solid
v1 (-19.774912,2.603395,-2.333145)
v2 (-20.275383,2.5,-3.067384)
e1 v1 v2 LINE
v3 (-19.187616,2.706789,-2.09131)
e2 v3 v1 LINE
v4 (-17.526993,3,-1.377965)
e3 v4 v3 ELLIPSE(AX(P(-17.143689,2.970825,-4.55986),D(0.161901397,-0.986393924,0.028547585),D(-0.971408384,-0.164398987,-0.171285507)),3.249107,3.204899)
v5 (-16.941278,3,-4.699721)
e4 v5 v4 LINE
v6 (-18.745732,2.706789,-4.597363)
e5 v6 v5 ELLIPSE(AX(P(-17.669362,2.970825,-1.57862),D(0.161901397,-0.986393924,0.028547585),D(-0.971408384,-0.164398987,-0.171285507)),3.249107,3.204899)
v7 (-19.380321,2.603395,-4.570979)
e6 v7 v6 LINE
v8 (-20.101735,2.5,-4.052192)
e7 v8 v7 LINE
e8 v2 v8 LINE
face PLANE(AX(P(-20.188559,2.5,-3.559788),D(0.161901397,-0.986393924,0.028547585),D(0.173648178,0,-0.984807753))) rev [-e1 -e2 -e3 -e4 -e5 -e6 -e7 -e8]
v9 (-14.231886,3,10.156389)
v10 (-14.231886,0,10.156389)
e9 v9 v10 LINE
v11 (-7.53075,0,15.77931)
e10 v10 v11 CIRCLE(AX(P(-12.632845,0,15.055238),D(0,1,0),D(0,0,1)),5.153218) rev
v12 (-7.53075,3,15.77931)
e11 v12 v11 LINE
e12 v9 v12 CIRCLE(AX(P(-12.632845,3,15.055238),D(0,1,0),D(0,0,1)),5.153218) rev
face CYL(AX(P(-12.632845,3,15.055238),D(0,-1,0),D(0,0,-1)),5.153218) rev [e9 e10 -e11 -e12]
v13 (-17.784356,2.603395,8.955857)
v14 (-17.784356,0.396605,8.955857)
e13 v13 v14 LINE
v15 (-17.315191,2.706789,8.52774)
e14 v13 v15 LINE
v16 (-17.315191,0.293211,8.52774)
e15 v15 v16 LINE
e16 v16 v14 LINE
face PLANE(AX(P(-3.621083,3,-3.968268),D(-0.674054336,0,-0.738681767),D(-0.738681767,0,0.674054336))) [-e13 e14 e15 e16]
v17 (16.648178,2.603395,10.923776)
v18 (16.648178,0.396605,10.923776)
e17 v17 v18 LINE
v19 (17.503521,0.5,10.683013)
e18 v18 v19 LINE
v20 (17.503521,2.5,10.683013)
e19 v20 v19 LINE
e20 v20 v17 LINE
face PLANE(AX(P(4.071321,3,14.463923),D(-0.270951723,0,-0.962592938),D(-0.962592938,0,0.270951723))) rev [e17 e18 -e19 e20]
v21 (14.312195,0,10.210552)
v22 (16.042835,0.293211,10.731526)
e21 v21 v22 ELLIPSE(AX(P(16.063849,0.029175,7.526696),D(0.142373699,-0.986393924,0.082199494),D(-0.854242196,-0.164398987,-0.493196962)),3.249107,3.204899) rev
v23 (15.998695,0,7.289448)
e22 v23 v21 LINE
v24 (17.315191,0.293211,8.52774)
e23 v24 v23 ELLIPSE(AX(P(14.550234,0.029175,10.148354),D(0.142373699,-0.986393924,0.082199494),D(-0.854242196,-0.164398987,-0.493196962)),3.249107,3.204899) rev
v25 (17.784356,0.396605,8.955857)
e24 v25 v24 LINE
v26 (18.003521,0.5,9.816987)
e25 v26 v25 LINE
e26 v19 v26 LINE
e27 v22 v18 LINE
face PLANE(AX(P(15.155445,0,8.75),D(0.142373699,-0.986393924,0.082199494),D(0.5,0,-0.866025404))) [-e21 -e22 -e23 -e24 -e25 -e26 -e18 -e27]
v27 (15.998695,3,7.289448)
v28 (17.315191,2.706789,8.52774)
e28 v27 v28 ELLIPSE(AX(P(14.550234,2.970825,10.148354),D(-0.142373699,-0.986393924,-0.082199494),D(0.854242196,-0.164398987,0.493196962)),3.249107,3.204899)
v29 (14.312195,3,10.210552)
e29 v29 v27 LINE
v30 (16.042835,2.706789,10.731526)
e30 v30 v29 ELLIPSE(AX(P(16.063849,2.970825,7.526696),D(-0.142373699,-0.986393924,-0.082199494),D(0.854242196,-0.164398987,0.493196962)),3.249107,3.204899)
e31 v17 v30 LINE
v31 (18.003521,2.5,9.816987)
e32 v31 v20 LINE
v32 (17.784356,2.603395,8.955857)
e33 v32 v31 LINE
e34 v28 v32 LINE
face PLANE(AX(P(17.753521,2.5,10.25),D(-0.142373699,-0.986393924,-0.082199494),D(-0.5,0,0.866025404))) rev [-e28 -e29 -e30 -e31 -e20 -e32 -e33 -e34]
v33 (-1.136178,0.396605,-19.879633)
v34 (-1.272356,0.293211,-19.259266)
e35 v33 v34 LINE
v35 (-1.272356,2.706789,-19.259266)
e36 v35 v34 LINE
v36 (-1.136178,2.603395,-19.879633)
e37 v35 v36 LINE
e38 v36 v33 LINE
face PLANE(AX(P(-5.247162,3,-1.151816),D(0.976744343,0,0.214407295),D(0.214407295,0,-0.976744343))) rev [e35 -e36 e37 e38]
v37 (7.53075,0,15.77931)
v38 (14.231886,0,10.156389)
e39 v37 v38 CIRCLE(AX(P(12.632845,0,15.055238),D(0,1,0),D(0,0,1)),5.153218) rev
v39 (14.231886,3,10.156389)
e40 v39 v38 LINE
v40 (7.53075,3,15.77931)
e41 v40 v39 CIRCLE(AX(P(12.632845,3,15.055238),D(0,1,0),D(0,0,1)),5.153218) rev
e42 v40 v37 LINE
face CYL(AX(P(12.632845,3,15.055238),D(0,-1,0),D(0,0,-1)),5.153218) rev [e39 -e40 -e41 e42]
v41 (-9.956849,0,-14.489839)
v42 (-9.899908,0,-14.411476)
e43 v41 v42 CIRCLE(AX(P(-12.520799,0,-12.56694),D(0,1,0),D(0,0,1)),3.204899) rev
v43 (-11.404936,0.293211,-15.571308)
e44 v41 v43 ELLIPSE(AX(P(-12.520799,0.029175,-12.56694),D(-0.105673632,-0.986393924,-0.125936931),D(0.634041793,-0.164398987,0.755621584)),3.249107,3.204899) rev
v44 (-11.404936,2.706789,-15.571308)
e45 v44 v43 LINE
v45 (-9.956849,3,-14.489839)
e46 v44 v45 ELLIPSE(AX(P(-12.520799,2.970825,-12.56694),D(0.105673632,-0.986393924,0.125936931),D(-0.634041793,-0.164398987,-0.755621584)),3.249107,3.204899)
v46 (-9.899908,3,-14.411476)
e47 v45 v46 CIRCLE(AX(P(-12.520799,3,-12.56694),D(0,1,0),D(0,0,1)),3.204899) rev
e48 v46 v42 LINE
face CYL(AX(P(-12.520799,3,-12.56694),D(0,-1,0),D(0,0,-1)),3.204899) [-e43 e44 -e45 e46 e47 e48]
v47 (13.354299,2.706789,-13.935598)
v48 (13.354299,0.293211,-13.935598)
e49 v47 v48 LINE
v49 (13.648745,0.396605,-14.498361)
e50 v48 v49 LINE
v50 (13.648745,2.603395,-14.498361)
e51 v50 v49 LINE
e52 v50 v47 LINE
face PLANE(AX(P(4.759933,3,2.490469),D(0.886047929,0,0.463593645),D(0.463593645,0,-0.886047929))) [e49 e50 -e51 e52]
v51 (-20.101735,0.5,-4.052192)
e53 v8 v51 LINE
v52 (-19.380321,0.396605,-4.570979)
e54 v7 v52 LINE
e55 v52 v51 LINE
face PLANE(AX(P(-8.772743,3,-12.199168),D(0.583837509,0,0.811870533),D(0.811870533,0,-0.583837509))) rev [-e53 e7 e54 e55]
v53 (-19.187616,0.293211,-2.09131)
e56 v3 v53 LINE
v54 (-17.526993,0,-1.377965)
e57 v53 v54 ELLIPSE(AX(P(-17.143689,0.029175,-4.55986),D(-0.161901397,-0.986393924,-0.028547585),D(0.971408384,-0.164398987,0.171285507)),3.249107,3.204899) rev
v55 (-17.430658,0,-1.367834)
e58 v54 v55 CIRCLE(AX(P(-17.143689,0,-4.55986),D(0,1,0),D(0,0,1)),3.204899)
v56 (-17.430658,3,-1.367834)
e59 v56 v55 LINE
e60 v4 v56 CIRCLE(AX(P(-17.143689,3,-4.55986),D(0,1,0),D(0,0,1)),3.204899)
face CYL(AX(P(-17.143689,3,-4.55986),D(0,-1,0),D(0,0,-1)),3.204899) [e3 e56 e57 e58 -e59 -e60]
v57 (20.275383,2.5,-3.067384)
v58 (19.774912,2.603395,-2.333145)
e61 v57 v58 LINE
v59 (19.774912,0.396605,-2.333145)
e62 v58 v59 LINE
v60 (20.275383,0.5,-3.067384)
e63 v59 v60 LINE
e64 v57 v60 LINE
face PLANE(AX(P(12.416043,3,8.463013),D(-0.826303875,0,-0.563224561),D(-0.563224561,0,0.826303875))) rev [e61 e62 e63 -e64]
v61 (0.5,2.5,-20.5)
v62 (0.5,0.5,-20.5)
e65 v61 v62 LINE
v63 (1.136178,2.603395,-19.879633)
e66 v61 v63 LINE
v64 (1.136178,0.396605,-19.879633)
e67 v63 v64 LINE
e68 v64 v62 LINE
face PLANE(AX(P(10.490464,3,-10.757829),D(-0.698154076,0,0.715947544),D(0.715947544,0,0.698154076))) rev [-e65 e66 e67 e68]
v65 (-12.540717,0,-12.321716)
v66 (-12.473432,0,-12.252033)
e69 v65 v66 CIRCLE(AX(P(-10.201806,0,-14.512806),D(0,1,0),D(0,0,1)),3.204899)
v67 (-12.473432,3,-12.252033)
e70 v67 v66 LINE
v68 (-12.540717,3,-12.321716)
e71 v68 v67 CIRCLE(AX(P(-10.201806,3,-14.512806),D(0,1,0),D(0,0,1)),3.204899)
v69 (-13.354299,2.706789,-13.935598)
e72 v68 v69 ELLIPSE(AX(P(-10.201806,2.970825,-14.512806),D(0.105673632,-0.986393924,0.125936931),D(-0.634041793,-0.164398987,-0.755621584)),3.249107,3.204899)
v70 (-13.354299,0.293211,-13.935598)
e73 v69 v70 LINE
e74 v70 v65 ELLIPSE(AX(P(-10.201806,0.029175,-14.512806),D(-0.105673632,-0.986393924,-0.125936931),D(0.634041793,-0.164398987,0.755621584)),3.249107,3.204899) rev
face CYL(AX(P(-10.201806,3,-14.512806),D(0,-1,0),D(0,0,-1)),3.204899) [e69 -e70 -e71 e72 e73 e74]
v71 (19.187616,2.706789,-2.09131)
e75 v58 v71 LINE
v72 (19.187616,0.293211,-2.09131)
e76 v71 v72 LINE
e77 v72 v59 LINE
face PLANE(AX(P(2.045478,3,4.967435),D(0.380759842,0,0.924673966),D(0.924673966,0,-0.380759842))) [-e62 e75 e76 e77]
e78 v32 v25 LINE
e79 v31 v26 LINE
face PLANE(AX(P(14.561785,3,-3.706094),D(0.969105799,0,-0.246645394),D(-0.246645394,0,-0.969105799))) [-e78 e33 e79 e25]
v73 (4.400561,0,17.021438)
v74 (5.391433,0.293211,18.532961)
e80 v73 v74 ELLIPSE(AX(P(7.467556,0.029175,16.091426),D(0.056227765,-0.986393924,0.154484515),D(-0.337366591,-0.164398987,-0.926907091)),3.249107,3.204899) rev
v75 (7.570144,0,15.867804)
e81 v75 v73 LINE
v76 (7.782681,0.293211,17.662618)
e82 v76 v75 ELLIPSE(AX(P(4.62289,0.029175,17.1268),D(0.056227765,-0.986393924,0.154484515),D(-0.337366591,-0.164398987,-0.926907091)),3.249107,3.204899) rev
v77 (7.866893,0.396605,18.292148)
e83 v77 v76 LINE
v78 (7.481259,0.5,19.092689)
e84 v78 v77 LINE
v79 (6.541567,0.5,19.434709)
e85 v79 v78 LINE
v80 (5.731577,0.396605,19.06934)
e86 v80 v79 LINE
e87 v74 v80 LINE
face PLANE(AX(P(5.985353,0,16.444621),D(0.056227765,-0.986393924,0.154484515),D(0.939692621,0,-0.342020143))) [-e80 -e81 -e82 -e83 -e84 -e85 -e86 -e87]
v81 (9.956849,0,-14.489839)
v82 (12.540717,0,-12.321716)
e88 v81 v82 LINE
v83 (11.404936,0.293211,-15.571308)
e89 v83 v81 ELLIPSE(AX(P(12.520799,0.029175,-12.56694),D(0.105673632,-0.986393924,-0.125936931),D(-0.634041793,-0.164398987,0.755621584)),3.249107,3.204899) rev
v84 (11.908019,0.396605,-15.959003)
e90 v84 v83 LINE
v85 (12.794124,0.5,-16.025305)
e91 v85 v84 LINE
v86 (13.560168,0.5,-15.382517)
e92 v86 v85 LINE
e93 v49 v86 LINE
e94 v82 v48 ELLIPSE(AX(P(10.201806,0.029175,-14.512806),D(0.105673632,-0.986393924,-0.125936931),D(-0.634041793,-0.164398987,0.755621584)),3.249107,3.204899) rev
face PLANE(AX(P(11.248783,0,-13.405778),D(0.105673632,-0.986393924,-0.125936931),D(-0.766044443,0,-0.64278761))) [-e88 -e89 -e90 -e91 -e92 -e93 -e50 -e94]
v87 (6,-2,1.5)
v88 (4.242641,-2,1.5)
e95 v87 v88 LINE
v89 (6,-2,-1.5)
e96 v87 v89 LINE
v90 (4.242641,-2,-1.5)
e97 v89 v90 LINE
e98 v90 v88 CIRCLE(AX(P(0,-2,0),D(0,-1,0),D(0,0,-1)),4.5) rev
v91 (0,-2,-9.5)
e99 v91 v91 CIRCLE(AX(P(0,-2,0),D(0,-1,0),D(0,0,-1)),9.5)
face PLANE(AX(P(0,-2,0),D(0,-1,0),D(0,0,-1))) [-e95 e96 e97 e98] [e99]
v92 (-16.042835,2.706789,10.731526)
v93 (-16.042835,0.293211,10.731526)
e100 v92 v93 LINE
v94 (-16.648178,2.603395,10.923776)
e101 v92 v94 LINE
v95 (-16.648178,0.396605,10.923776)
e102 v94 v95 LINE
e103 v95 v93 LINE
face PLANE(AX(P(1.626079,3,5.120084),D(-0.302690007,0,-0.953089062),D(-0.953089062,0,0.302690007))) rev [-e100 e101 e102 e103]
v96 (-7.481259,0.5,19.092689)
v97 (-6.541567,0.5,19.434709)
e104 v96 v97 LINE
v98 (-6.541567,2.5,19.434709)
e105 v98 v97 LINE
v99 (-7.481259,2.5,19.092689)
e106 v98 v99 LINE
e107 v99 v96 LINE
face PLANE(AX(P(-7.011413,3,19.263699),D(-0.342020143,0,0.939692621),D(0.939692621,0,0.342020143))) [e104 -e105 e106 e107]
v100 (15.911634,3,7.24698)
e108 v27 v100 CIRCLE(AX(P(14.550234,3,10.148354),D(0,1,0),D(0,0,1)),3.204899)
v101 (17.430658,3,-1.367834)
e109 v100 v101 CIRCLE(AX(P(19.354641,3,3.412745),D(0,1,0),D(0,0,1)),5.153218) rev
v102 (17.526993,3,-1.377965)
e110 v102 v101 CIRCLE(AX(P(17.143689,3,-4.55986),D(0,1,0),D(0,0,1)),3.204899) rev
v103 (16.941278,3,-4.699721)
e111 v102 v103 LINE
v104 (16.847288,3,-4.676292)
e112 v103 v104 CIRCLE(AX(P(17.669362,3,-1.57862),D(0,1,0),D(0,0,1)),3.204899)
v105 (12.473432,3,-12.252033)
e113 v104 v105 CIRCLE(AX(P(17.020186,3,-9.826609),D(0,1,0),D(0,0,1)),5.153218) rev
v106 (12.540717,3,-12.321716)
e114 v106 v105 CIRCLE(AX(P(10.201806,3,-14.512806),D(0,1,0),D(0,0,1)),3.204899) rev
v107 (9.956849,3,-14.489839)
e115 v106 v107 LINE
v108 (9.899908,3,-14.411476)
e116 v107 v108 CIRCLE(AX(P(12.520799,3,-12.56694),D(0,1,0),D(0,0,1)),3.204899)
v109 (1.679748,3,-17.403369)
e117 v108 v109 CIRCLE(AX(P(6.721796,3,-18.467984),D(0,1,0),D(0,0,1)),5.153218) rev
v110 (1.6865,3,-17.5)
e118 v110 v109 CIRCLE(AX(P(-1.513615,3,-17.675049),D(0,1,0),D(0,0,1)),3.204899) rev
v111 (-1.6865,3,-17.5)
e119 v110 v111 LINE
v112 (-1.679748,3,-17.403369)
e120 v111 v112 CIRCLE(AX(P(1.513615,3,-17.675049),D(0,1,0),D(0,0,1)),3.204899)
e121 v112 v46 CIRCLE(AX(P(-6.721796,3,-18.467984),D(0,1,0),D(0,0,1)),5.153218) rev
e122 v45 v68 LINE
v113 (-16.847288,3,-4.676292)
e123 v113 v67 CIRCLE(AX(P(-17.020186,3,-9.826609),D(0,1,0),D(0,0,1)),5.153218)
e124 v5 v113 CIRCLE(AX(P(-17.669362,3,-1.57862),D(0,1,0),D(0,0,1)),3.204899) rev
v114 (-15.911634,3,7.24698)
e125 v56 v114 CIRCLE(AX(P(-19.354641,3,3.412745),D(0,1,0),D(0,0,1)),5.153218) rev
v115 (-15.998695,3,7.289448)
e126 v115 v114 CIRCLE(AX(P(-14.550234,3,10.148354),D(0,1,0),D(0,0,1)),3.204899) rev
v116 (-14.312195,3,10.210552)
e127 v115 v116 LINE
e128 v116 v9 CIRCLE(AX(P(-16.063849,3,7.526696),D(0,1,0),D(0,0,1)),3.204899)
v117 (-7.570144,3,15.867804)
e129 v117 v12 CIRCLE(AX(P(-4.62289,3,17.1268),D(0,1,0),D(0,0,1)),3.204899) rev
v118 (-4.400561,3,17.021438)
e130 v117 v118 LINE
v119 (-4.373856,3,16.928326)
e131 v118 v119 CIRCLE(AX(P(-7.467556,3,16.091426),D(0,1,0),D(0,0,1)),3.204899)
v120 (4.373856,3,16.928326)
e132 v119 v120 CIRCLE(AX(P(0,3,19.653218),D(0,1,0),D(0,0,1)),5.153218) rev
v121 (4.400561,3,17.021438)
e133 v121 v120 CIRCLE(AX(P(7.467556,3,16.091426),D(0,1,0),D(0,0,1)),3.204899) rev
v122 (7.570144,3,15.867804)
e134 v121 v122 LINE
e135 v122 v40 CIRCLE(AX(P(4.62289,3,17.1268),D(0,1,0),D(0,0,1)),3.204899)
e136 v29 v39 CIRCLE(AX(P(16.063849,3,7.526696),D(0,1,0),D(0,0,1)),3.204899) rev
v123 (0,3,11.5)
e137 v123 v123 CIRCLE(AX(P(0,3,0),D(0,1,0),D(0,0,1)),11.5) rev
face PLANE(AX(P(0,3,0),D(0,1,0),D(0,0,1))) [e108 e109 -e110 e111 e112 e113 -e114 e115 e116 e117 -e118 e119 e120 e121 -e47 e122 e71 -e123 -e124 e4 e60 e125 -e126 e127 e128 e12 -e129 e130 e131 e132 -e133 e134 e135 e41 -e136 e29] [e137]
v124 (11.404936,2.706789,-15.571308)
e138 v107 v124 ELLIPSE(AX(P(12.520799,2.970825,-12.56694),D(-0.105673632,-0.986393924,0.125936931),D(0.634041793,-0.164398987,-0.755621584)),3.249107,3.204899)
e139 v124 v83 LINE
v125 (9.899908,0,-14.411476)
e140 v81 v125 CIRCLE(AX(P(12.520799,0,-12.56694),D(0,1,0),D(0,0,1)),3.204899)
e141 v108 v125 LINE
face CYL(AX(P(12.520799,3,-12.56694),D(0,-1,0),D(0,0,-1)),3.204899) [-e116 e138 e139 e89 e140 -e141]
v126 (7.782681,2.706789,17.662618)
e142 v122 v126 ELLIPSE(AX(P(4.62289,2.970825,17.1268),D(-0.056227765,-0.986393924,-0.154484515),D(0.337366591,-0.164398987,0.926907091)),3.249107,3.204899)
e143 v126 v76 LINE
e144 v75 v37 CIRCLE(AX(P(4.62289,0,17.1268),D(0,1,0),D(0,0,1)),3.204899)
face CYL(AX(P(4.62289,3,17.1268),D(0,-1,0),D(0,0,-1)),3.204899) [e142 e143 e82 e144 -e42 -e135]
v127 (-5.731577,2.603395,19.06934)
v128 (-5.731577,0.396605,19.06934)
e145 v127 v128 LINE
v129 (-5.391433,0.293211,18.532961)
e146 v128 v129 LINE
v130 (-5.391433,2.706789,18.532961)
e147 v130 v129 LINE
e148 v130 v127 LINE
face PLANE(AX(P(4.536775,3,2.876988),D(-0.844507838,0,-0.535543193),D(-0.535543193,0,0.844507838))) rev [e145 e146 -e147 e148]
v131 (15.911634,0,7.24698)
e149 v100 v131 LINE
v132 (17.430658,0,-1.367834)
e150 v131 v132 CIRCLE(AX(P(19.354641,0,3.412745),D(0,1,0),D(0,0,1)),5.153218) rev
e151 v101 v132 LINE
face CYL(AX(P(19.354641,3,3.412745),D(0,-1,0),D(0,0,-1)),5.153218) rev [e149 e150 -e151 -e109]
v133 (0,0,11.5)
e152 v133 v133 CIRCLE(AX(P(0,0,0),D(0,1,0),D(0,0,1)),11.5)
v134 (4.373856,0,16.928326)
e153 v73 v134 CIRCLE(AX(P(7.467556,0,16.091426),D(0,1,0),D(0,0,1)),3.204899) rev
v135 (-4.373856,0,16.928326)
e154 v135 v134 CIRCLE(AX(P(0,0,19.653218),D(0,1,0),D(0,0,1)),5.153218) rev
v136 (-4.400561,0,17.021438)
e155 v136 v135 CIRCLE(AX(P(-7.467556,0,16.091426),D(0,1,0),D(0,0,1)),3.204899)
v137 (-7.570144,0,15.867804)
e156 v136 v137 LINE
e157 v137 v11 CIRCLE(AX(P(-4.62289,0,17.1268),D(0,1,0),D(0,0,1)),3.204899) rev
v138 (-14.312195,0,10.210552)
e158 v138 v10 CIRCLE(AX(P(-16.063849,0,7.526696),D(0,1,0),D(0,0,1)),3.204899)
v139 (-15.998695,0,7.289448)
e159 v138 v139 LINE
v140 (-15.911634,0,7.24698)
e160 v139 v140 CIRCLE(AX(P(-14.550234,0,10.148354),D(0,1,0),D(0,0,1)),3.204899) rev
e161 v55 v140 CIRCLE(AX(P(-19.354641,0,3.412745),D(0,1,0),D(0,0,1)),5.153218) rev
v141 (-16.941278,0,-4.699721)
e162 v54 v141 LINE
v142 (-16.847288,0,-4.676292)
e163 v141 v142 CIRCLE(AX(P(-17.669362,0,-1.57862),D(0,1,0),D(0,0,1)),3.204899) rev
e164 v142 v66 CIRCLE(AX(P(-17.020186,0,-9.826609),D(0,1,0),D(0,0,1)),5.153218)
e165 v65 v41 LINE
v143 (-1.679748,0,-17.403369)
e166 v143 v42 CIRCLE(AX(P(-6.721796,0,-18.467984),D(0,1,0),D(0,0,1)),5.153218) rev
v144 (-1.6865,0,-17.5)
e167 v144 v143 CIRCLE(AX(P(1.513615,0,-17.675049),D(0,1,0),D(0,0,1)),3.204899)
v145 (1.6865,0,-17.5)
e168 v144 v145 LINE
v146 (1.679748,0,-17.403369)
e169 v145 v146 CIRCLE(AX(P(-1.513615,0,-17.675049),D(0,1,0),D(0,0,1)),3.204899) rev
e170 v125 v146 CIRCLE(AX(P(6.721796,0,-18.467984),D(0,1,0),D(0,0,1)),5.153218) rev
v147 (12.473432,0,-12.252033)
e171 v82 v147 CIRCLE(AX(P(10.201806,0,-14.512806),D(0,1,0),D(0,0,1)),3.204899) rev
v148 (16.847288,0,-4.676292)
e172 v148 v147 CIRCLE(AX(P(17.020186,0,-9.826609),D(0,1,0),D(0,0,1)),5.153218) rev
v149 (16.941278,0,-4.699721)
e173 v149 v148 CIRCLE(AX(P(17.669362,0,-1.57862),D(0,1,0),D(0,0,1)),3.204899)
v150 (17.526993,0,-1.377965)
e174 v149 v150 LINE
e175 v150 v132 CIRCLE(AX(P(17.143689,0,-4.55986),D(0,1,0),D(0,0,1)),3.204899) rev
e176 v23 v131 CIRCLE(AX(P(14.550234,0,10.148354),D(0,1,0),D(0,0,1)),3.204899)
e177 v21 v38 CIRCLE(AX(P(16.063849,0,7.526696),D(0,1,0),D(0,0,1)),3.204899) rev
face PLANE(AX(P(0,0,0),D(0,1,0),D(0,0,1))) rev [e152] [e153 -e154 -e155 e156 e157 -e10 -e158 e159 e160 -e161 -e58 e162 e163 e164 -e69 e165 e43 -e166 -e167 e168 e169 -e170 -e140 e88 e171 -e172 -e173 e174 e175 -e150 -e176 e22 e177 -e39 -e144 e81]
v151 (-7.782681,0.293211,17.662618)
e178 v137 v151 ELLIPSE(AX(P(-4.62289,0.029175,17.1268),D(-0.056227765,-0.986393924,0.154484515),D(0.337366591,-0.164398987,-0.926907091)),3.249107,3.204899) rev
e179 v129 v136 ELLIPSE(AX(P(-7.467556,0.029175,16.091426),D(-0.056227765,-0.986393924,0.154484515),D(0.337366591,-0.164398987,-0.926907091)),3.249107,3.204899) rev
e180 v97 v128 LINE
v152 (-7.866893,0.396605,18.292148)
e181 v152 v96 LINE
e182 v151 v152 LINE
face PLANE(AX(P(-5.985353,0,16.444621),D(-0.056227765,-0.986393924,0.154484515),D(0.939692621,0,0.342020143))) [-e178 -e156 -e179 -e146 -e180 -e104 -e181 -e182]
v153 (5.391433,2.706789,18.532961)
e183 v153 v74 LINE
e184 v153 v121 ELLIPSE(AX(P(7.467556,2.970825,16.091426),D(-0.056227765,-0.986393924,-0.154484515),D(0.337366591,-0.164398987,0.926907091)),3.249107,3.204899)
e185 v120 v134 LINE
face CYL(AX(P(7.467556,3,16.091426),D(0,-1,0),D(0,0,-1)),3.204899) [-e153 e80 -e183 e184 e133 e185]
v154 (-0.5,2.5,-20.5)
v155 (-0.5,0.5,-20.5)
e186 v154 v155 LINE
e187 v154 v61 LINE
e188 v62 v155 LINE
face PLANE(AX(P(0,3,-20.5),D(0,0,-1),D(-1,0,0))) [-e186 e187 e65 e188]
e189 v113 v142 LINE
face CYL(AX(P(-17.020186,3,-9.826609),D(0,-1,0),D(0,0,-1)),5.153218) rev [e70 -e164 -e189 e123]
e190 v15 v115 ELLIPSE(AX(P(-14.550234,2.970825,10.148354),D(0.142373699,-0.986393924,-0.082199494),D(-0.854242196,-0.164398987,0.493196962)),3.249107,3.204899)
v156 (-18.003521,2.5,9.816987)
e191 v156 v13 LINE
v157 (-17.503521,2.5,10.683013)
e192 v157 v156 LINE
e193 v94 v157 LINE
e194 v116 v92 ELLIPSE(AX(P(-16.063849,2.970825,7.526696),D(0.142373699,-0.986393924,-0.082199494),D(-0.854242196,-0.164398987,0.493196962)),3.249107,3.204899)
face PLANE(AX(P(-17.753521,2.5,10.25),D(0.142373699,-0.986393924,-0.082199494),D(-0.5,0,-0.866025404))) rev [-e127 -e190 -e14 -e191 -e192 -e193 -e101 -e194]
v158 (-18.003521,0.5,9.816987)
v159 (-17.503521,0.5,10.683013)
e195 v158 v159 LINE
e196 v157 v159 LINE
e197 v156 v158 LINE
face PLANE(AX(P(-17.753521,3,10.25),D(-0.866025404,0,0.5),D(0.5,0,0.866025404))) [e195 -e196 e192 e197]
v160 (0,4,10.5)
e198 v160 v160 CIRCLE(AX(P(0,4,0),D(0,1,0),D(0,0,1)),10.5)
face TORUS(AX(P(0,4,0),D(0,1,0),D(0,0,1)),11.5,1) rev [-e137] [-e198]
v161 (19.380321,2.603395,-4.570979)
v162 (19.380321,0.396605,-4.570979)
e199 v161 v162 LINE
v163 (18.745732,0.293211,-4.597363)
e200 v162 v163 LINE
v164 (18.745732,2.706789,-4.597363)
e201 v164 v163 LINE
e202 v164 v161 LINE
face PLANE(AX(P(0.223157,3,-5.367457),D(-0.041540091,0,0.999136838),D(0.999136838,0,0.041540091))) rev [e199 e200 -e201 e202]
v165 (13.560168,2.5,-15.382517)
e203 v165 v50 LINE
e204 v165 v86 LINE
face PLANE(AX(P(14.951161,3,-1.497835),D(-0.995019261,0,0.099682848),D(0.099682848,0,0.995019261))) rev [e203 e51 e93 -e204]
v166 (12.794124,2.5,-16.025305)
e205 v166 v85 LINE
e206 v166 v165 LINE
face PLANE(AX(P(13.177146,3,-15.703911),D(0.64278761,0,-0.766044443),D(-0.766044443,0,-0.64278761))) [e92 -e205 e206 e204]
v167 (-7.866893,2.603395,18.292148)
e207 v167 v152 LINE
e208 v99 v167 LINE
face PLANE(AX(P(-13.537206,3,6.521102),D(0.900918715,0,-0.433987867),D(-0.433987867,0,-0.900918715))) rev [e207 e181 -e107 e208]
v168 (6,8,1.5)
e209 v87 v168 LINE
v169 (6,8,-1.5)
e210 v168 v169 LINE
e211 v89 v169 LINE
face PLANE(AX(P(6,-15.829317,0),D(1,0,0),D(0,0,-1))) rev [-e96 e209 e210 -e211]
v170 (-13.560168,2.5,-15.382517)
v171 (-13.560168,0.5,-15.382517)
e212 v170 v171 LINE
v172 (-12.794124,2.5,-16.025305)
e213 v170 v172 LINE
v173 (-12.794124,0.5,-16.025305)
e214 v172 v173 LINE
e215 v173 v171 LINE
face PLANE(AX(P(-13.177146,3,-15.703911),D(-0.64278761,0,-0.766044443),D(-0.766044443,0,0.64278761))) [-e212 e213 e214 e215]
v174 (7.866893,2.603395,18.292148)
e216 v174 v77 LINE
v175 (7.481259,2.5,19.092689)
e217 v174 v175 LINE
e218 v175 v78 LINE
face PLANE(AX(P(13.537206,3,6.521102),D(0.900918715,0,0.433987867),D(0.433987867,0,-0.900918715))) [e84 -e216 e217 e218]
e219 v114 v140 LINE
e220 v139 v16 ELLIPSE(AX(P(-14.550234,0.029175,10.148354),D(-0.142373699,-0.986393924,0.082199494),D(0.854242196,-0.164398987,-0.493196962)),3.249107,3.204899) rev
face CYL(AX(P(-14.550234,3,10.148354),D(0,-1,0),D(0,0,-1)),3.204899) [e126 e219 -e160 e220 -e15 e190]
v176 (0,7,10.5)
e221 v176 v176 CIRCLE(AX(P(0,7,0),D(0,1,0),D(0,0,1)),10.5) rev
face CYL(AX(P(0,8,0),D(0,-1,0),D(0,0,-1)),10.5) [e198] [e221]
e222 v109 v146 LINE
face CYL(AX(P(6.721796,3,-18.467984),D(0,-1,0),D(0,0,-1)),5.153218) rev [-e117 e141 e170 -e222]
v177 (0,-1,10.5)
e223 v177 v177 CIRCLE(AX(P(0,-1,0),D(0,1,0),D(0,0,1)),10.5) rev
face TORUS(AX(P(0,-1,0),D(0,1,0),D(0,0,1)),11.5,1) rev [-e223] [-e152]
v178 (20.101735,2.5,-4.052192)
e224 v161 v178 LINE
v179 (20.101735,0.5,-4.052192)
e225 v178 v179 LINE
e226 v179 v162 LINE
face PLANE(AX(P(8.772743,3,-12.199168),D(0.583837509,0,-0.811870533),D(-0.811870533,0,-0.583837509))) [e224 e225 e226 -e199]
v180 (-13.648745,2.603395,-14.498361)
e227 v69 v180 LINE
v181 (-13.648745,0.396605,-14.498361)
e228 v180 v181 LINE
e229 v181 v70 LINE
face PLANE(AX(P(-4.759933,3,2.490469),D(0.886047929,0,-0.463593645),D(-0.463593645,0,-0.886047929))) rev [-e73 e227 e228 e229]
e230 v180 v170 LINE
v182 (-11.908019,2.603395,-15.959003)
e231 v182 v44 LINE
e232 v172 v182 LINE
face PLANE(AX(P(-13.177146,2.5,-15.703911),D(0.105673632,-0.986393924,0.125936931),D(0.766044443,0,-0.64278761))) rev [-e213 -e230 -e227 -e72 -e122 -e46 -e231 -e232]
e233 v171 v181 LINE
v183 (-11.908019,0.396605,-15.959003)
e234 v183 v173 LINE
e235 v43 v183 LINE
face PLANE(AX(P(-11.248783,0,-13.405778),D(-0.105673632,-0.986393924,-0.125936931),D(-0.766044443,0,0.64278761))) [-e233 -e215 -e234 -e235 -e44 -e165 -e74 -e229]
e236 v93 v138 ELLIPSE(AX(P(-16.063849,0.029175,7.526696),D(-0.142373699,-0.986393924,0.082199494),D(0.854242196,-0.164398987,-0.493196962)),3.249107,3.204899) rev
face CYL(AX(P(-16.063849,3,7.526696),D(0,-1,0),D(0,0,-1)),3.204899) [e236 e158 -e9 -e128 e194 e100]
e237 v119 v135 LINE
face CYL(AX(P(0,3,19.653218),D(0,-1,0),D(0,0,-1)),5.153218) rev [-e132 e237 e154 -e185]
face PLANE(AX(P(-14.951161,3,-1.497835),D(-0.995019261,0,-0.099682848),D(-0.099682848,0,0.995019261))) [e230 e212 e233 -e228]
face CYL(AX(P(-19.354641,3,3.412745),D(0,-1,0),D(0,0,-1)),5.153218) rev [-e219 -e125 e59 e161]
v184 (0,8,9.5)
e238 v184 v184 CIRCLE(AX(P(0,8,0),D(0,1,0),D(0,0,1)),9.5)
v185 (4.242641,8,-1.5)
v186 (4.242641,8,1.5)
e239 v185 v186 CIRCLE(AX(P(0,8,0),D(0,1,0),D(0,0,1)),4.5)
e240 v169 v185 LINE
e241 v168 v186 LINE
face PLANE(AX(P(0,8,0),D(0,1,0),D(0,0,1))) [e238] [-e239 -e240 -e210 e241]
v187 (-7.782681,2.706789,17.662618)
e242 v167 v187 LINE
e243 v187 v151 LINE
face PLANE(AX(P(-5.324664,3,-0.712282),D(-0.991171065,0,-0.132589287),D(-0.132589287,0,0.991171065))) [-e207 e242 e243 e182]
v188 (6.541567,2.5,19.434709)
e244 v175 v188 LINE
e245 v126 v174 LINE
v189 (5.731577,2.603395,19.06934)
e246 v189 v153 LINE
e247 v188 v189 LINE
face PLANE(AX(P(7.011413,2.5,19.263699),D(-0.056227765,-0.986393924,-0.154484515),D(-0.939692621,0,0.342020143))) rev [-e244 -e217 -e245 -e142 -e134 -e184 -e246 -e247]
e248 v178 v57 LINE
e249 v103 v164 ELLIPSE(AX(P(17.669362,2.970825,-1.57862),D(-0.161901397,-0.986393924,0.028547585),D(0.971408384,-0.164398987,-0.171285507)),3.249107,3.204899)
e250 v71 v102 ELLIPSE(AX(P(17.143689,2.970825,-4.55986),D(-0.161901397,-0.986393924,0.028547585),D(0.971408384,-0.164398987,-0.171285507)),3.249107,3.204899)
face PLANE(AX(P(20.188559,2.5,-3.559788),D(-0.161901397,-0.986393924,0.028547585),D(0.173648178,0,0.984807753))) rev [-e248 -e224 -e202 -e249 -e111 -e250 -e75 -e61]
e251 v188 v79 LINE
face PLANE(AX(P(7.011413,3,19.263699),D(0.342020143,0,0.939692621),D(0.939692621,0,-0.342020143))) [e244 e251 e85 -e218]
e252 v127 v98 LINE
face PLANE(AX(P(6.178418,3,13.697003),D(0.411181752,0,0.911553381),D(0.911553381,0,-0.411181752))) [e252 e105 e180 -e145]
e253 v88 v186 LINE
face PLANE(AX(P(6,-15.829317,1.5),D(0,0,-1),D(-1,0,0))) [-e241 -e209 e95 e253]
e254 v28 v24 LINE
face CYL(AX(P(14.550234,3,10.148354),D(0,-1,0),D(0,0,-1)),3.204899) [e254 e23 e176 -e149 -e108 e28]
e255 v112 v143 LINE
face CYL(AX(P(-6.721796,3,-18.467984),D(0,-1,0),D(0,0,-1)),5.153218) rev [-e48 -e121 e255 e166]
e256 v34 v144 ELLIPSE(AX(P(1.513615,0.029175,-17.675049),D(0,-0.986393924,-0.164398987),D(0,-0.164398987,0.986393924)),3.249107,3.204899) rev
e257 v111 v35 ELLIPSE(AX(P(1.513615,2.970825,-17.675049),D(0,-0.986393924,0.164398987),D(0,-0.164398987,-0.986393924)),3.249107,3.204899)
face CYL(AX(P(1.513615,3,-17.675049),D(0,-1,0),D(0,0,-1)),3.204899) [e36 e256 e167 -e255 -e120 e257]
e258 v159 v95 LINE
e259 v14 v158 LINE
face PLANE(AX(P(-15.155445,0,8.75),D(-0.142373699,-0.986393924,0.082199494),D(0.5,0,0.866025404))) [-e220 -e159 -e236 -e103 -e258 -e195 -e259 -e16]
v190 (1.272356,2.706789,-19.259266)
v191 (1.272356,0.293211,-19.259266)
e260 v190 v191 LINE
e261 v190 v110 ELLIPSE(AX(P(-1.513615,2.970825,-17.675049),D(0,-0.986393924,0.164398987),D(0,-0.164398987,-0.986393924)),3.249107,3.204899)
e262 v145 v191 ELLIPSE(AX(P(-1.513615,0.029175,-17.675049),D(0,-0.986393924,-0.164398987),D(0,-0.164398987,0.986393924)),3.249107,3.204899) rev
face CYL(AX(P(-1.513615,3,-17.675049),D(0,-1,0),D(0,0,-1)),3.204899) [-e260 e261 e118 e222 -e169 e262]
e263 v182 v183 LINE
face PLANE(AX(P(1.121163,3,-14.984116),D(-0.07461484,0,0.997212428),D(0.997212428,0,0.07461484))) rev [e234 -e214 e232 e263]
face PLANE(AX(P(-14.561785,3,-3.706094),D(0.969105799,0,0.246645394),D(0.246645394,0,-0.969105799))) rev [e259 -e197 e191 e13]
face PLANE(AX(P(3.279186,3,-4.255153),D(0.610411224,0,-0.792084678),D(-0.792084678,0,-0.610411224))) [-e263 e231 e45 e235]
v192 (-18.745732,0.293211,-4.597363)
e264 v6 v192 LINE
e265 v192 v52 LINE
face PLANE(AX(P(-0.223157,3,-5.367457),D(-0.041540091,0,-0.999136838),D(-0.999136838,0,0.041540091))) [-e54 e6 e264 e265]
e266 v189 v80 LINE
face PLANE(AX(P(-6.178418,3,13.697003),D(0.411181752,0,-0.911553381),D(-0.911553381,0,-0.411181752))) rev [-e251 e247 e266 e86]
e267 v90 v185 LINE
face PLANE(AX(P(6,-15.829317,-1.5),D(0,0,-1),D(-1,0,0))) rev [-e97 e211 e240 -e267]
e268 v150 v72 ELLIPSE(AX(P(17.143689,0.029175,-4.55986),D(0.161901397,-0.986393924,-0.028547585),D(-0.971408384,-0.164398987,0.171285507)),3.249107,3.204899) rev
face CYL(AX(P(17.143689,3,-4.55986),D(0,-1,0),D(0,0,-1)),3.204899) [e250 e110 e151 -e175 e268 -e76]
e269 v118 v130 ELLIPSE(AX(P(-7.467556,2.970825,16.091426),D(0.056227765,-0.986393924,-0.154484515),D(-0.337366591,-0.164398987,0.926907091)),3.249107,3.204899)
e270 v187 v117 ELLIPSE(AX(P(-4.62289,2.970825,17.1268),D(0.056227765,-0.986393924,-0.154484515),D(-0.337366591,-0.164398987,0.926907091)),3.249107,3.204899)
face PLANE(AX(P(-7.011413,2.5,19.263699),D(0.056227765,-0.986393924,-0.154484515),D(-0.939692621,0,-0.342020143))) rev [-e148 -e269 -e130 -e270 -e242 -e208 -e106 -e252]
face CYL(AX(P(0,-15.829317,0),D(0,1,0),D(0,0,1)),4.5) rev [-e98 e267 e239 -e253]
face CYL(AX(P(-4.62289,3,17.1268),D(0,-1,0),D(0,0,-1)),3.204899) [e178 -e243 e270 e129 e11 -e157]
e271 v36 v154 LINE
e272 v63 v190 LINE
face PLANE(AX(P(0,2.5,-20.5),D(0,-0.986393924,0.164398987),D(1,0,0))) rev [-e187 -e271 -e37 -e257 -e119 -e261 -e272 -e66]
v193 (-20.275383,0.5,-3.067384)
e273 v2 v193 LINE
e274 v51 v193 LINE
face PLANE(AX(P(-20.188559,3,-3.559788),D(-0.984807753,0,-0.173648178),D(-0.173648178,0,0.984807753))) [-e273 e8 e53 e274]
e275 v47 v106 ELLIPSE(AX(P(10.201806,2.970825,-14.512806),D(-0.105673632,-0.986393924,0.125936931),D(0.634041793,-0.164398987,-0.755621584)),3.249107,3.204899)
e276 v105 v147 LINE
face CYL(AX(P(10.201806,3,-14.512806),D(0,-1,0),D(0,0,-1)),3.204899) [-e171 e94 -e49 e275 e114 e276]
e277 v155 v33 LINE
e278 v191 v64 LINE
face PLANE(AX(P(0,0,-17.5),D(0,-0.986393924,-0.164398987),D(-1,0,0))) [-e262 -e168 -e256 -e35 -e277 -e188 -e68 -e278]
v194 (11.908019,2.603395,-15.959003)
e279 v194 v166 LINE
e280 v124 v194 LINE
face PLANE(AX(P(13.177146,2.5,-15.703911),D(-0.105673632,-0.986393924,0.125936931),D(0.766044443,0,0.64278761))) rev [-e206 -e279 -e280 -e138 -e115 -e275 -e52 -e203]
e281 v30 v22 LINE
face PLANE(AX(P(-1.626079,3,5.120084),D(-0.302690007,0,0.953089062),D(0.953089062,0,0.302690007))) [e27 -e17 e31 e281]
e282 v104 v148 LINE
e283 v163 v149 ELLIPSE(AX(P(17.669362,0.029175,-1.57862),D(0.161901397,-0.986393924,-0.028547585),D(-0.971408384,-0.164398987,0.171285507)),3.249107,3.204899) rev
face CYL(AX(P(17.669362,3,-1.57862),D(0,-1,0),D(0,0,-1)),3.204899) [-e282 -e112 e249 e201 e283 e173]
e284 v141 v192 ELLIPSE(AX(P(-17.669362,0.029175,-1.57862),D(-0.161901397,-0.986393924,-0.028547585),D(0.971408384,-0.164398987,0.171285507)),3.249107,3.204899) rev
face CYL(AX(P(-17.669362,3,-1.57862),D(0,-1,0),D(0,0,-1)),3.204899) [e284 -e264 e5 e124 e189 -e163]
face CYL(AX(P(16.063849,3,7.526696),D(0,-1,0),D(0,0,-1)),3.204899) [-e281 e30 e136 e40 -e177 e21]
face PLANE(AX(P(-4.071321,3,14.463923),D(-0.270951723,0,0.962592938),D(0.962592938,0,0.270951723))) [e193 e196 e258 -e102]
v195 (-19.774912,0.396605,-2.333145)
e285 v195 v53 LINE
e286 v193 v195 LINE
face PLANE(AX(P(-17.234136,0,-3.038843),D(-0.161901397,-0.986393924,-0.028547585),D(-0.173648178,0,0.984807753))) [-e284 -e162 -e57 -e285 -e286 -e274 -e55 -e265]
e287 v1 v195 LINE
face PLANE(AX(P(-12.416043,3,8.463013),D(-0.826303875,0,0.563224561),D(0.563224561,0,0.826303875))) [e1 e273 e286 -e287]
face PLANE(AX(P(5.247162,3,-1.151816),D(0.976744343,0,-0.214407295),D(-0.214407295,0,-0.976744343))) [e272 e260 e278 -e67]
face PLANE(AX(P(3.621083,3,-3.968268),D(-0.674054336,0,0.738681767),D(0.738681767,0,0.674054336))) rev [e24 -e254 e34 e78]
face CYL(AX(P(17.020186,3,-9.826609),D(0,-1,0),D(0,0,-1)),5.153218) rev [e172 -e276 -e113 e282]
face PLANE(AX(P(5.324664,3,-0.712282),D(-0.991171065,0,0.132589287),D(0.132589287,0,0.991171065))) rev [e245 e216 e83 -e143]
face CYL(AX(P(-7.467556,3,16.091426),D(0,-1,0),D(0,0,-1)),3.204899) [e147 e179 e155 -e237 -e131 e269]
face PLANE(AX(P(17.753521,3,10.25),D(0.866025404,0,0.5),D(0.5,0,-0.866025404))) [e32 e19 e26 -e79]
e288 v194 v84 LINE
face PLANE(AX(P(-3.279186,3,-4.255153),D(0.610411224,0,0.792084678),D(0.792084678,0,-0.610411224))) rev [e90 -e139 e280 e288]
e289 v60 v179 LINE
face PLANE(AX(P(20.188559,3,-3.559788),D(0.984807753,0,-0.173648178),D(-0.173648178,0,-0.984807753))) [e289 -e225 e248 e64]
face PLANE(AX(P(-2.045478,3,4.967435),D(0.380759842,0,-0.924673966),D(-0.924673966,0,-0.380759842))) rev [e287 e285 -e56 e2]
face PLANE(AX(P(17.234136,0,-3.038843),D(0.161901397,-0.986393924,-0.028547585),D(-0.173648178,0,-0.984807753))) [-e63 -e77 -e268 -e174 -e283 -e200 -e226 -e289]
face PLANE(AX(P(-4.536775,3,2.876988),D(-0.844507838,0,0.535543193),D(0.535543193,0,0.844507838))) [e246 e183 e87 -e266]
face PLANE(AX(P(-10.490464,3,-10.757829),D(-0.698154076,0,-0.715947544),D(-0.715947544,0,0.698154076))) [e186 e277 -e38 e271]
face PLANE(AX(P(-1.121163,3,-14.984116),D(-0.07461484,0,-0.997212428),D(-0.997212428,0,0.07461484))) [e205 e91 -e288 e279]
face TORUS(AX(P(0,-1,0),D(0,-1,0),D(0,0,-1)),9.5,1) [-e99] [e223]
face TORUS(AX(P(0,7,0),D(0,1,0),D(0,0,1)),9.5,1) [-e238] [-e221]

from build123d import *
from OCP.BRepFilletAPI import BRepFilletAPI_MakeChamfer

# Parameters (mm, degrees)
BOSS_EXTRUDE1_DEPTH = 3
SKETCH2_R           = 10.500000000000002
BOSS_EXTRUDE2_DEPTH = 5
FILLET1_R           = 1
FILLET2_R           = 1
BOSS_EXTRUDE3_START = 2
SKETCH4_R           = 10.5
BOSS_EXTRUDE3_DEPTH = 2
FILLET3_R           = 1
FILLET4_R           = 1
CUT_EXTRUDE1_DEPTH  = 10
CHAMFER1_SIZE       = 3
CHAMFER1_SIZE2      = 0.5
CHAMFER2_SIZE       = 0.5
CHAMFER2_SIZE2      = 3


with BuildPart() as part:
    # Sketch1 → Boss-Extrude1 (new body)
    with BuildSketch(Plane(origin=(0, 0, 0), x_dir=(1, 0, 0), z_dir=(0, 1, 0))):
        with BuildLine():
            Line((-1.1361781683937604, 19.87963278842776), (-1.2723563367881987, 19.259265576854713))
            ThreePointArc((-1.2723563367881987, 19.259265576854713), (-1.61675206137744, 18.362202828380155), (-1.679748173200239, 17.40336943319931))
            ThreePointArc((-1.679748173200239, 17.40336943319931), (-4.959292078222066, 13.625543001395792), (-9.899908484538452, 14.411475758975762))
            ThreePointArc((-9.899908484538452, 14.411475758975762), (-10.56449253211368, 15.105491633091315), (-11.404935782999473, 15.571308262094906))
            Line((-11.404935782999473, 15.571308262094906), (-11.908018669226982, 15.9590034778603))
            Line((-11.908018669226982, 15.9590034778603), (-12.794123777014558, 16.025304888782568))
            Line((-12.794123777014558, 16.025304888782568), (-13.177145998574076, 15.703911083939328))
            Line((-13.177145998574076, 15.703911083939328), (-13.560168220133505, 15.382517279095985))
            Line((-13.560168220133505, 15.382517279095985), (-13.64874461381075, 14.498360979781168))
            Line((-13.64874461381075, 14.498360979781168), (-13.354298785928489, 13.935598485308667))
            ThreePointArc((-13.354298785928489, 13.935598485308667), (-13.041500397153213, 13.027035247115714), (-12.47343199237884, 12.252033132723007))
            ThreePointArc((-12.47343199237884, 12.252033132723007), (-12.557368354878863, 7.250000000000451), (-16.847287937141115, 4.676292411418168))
            ThreePointArc((-16.847287937141115, 4.676292411418168), (-17.802493658572583, 4.780753023841534), (-18.74573169818019, 4.597362755687927))
            Line((-18.74573169818019, 4.597362755687927), (-19.380321228631775, 4.570979075436471))
            Line((-19.380321228631775, 4.570979075436471), (-20.101734847916855, 4.0521915186783986))
            Line((-20.101734847916855, 4.0521915186783986), (-20.18855893675035, 3.559787642172294))
            Line((-20.18855893675035, 3.559787642172294), (-20.275383025583707, 3.0673837656661704))
            Line((-20.275383025583707, 3.0673837656661704), (-19.77491176552594, 2.333144937361034))
            Line((-19.77491176552594, 2.333144937361034), (-19.18761641663395, 2.0913099855612147))
            ThreePointArc((-19.18761641663395, 2.0913099855612147), (-18.363985756968965, 1.5963730943559744), (-17.430658355565846, 1.3678343632640542))
            ThreePointArc((-17.430658355565846, 1.3678343632640542), (-14.27971241867698, -2.5178985761701718), (-15.911634127196386, -7.246980126647359))
            ThreePointArc((-15.911634127196386, -7.246980126647359), (-16.710510149506995, -7.78095305741542), (-17.315191416180426, -8.527739878101265))
            Line((-17.315191416180426, -8.527739878101265), (-17.784356096880753, -8.955857237158021))
            Line((-17.784356096880753, -8.955857237158021), (-18.003520777580764, -9.816987298107405))
            Line((-18.003520777580764, -9.816987298107405), (-17.753520777580768, -10.249999999999627))
            Line((-17.753520777580768, -10.249999999999627), (-17.503520777580654, -10.683012701891785))
            Line((-17.503520777580654, -10.683012701891785), (-16.64817792848777, -10.92377555126792))
            Line((-16.64817792848777, -10.92377555126792), (-16.042835079393377, -10.731525698751813))
            ThreePointArc((-16.042835079393377, -10.731525698751813), (-15.093758088131102, -10.581249770963566), (-14.2318859539962, -10.156389306551269))
            ThreePointArc((-14.2318859539962, -10.156389306551269), (-9.320420340454985, -11.107644425224919), (-7.530749871027556, -15.77931012223921))
            ThreePointArc((-7.530749871027556, -15.77931012223921), (-7.799493224853872, -16.701864727446964), (-7.7826806336331344, -17.66261824765509))
            Line((-7.7826806336331344, -17.66261824765509), (-7.866893096297905, -18.29214841522))
            Line((-7.866893096297905, -18.29214841522), (-7.4812592485692155, -19.09268865444786))
            Line((-7.4812592485692155, -19.09268865444786), (-7.011412938176259, -19.2636987261107))
            Line((-7.011412938176259, -19.2636987261107), (-6.541566627783259, -19.434708797773407))
            Line((-6.541566627783259, -19.434708797773407), (-5.731576614822292, -19.06934005521649))
            Line((-5.731576614822292, -19.06934005521649), (-5.391432912253138, -18.532961240995856))
            ThreePointArc((-5.391432912253138, -18.532961240995856), (-4.760993261421028, -17.80778827095715), (-4.373855944757768, -16.92832554413727))
            ThreePointArc((-4.373855944757768, -16.92832554413727), (-2.5873e-13, -14.499999999999906), (4.3738559447571745, -16.928325544137405))
            ThreePointArc((4.3738559447571745, -16.928325544137405), (4.760993261420172, -17.807788270955786), (5.391432912251758, -18.532961240994798))
            Line((5.391432912251758, -18.532961240994798), (5.731576614820664, -19.06934005521577))
            Line((5.731576614820664, -19.06934005521577), (6.541566627782982, -19.434708797773652))
            Line((6.541566627782982, -19.434708797773652), (7.0114129381759405, -19.26369872611082))
            Line((7.0114129381759405, -19.26369872611082), (7.4812592485688505, -19.092688654447862))
            Line((7.4812592485688505, -19.092688654447862), (7.866893096297095, -18.292148415221522))
            Line((7.866893096297095, -18.292148415221522), (7.782680633632731, -17.66261824765671))
            ThreePointArc((7.782680633632731, -17.66261824765671), (7.7994932248540705, -16.701864727448484), (7.530749871027006, -15.779310122239508))
            ThreePointArc((7.530749871027006, -15.779310122239508), (9.320420340454572, -11.107644425225274), (14.23188595399582, -10.156389306551766))
            ThreePointArc((14.23188595399582, -10.156389306551766), (15.093758088129494, -10.581249770962984), (16.04283507939157, -10.731525698751803))
            Line((16.04283507939157, -10.731525698751803), (16.64817792848599, -10.923775551268324))
            Line((16.64817792848599, -10.923775551268324), (17.5035207775806, -10.683012701892142))
            Line((17.5035207775806, -10.683012701892142), (17.753520777580604, -10.249999999999922))
            Line((17.753520777580604, -10.249999999999922), (18.00352077758049, -9.816987298107634))
            Line((18.00352077758049, -9.816987298107634), (17.784356096881123, -8.955857237159611))
            Line((17.784356096881123, -8.955857237159611), (17.315191416181165, -8.52773987810267))
            ThreePointArc((17.315191416181165, -8.52773987810267), (16.71051014950813, -7.780953057416363), (15.911634127196157, -7.246980126647927))
            ThreePointArc((15.911634127196157, -7.246980126647927), (14.279712418676887, -2.5178985761706927), (17.43065835556587, 1.3678343632634447))
            ThreePointArc((17.43065835556587, 1.3678343632634447), (18.363985756967264, 1.5963730943555055), (19.187616416632455, 2.091309985560174))
            Line((19.187616416632455, 2.091309985560174), (19.774911765524735, 2.3331449373596937))
            Line((19.774911765524735, 2.3331449373596937), (20.275383025583377, 3.0673837656658103))
            Line((20.275383025583377, 3.0673837656658103), (20.188558936749914, 3.559787642171918))
            Line((20.188558936749914, 3.559787642171918), (20.101734847916315, 4.052191518678001))
            Line((20.101734847916315, 4.052191518678001), (19.380321228632635, 4.570979075435552))
            Line((19.380321228632635, 4.570979075435552), (18.74573169818122, 4.597362755687423))
            ThreePointArc((18.74573169818122, 4.597362755687423), (17.802493658573834, 4.78075302384167), (16.847287937134777, 4.676292411414891))
            ThreePointArc((16.847287937134777, 4.676292411414891), (12.557368354874384, 7.249999999999774), (12.473431992377382, 12.252033132722048))
            ThreePointArc((12.473431992377382, 12.252033132722048), (13.041500397151985, 13.027035247114444), (13.354298785927934, 13.935598485306992))
            Line((13.354298785927934, 13.935598485306992), (13.648744613810612, 14.498360979779449))
            Line((13.648744613810612, 14.498360979779449), (13.560168220133354, 15.382517279095445))
            Line((13.560168220133354, 15.382517279095445), (13.177145998573863, 15.703911083938719))
            Line((13.177145998573863, 15.703911083938719), (12.794123777014287, 16.025304888781886))
            Line((12.794123777014287, 16.025304888781886), (11.908018669228412, 15.959003477860701))
            Line((11.908018669228412, 15.959003477860701), (11.404935783000788, 15.571308262095705))
            ThreePointArc((11.404935783000788, 15.571308262095705), (10.564492532114471, 15.105491633092715), (9.899908484538779, 14.411475758975572))
            ThreePointArc((9.899908484538779, 14.411475758975572), (4.959292078222331, 13.625543001395524), (1.6797481732004549, 17.403369433199202))
            ThreePointArc((1.6797481732004549, 17.403369433199202), (1.6167520613771744, 18.362202828378468), (1.272356336788733, 19.259265576853146))
            Line((1.272356336788733, 19.259265576853146), (1.1361781683946401, 19.879632788426427))
            Line((1.1361781683946401, 19.879632788426427), (0.5000000000000316, 20.499999999999623))
            Line((0.5000000000000316, 20.499999999999623), (-1.246e-14, 20.50000000000019))
            Line((-1.246e-14, 20.50000000000019), (-0.500000000000012, 20.500000000000096))
            Line((-0.500000000000012, 20.500000000000096), (-1.1361781683937604, 19.87963278842776))
        make_face()
    extrude(amount=BOSS_EXTRUDE1_DEPTH)

    # Sketch2 → Boss-Extrude2 (add)
    with BuildSketch(Plane(origin=(0, 3, 0), x_dir=(1, 0, 0), z_dir=(0, 1, 0))):
        with Locations(Location((0, 0, 0), (0, 0, 270))):
            Circle(SKETCH2_R)
    extrude(amount=BOSS_EXTRUDE2_DEPTH)

    # Fillet1
    fillet1_edges = [part.edges().sort_by_distance(p)[0] for p in [
        (-1.45e-15, 3, -10.500000000000002),
    ]]
    fillet(fillet1_edges, radius=FILLET1_R)

    # Fillet2
    fillet2_edges = [part.edges().sort_by_distance(p)[0] for p in [
        (-1.45e-15, 8, -10.500000000000002),
    ]]
    fillet(fillet2_edges, radius=FILLET2_R)

    # Sketch4 → Boss-Extrude3 (add)
    with BuildSketch(Plane.XZ.offset(BOSS_EXTRUDE3_START)):
        with Locations(Location((0, 0, 0), (0, 0, 90))):
            Circle(SKETCH4_R)
    extrude(amount=-BOSS_EXTRUDE3_DEPTH)

    # Fillet3
    fillet3_edges = [part.edges().sort_by_distance(p)[0] for p in [
        (-1.93e-15, 0, -10.5),
    ]]
    fillet(fillet3_edges, radius=FILLET3_R)

    # Fillet4
    fillet4_edges = [part.edges().sort_by_distance(p)[0] for p in [
        (-1.93e-15, -2, -10.5),
    ]]
    fillet(fillet4_edges, radius=FILLET4_R - 0.0001)  # a hair under: the kernel refuses the full size

    # Sketch3 → Cut-Extrude1 (cut)
    with BuildSketch(Plane(origin=(0, 8, 0), x_dir=(1, 0, 0), z_dir=(0, 1, 0))):
        with BuildLine():
            Line((6, 0), (6, 1.5))
            Line((6, 1.5), (4.242640687119285, 1.4999999999999996))
            ThreePointArc((4.242640687119285, 1.4999999999999996), (-4.499999999999999, 5.5e-16), (4.242640687119285, -1.4999999999999996))
            Line((4.242640687119285, -1.4999999999999996), (6, -1.4999999999999991))
            Line((6, -1.4999999999999991), (6, 0))
        make_face()
    extrude(amount=-CUT_EXTRUDE1_DEPTH, mode=Mode.SUBTRACT)

    # Chamfer1
    chamfer1_edges = [part.edges().sort_by_distance(p)[0] for p in [
        (17.753520777580547, 3, 10.249999999999888),
        (-17.75352077758071, 3, 10.249999999999595),
        (-7.011412938176237, 3, 19.263698726110633),
        (7.011412938175916, 3, 19.263698726110757),
        (-20.188558936750283, 3, -3.5597876421722843),
        (-13.177145998574032, 3, -15.703911083939277),
        (0.2500000000000096, 3, -20.499999999999908),
        (13.17714599857382, 3, -15.703911083938666),
        (20.188558936749846, 3, -3.5597876421719055),
    ]]
    chamfer1_side = [part.faces().sort_by_distance(p)[0] for p in [
        (3.7e-15, 3, -12.069134921973648),
    ]]
    chamfer(chamfer1_edges, length=CHAMFER1_SIZE, length2=CHAMFER1_SIZE2, reference=chamfer1_side[0])

    # Chamfer2: one chamfer whose edges measure the first distance from different faces: ONE call of the kernel's chamfer builder (chamfer() names one face for all edges)
    chamfer2_edges_1 = [part.edges().sort_by_distance(p)[0] for p in [
        (17.753520777580547, 0, 10.249999999999888),
    ]]
    chamfer2_side_1 = [part.faces().sort_by_distance(p)[0] for p in [
        (17.753520777580604, 1.2500000000000002, 10.249999999999922),
    ]]
    chamfer2_edges_2 = [part.edges().sort_by_distance(p)[0] for p in [
        (7.0114129381759165, 0, 19.263698726110757),
    ]]
    chamfer2_side_2 = [part.faces().sort_by_distance(p)[0] for p in [
        (7.01141293817594, 1.2500000000000002, 19.26369872611082),
    ]]
    chamfer2_edges_3 = [part.edges().sort_by_distance(p)[0] for p in [
        (-7.011412938176237, 0, 19.263698726110633),
    ]]
    chamfer2_side_3 = [part.faces().sort_by_distance(p)[0] for p in [
        (-7.011412938176261, 1.25, 19.2636987261107),
    ]]
    chamfer2_edges_4 = [part.edges().sort_by_distance(p)[0] for p in [
        (-17.753520777580707, 0, 10.249999999999595),
    ]]
    chamfer2_side_4 = [part.faces().sort_by_distance(p)[0] for p in [
        (-17.753520777580768, 1.25, 10.249999999999629),
    ]]
    chamfer2_edges_5 = [part.edges().sort_by_distance(p)[0] for p in [
        (-20.188558936750283, 0, -3.5597876421722843),
    ]]
    chamfer2_side_5 = [part.faces().sort_by_distance(p)[0] for p in [
        (-20.18855893675035, 1.2500000000000002, -3.5597876421722967),
    ]]
    chamfer2_edges_6 = [part.edges().sort_by_distance(p)[0] for p in [
        (-13.177145998574032, 0, -15.703911083939277),
    ]]
    chamfer2_side_6 = [part.faces().sort_by_distance(p)[0] for p in [
        (-13.177145998574076, 1.25, -15.703911083939326),
    ]]
    chamfer2_edges_7 = [part.edges().sort_by_distance(p)[0] for p in [
        (0.2500000000000096, 0, -20.499999999999908),
    ]]
    chamfer2_side_7 = [part.faces().sort_by_distance(p)[0] for p in [
        (0.2500000000000096, 1.25, -20.499999999999904),
    ]]
    chamfer2_edges_8 = [part.edges().sort_by_distance(p)[0] for p in [
        (13.17714599857382, 0, -15.703911083938666),
    ]]
    chamfer2_side_8 = [part.faces().sort_by_distance(p)[0] for p in [
        (13.177145998573865, 1.2500000000000002, -15.703911083938717),
    ]]
    chamfer2_edges_9 = [part.edges().sort_by_distance(p)[0] for p in [
        (20.188558936749846, 0, -3.5597876421719055),
    ]]
    chamfer2_side_9 = [part.faces().sort_by_distance(p)[0] for p in [
        (20.188558936749914, 1.25, -3.5597876421719175),
    ]]
    chamfer2 = BRepFilletAPI_MakeChamfer(part.part.solid().wrapped)
    for e in chamfer2_edges_1:
        chamfer2.Add(CHAMFER2_SIZE, CHAMFER2_SIZE2, e.wrapped, chamfer2_side_1[0].wrapped)  # the first distance lies on this face
    for e in chamfer2_edges_2:
        chamfer2.Add(CHAMFER2_SIZE, CHAMFER2_SIZE2, e.wrapped, chamfer2_side_2[0].wrapped)  # the first distance lies on this face
    for e in chamfer2_edges_3:
        chamfer2.Add(CHAMFER2_SIZE, CHAMFER2_SIZE2, e.wrapped, chamfer2_side_3[0].wrapped)  # the first distance lies on this face
    for e in chamfer2_edges_4:
        chamfer2.Add(CHAMFER2_SIZE, CHAMFER2_SIZE2, e.wrapped, chamfer2_side_4[0].wrapped)  # the first distance lies on this face
    for e in chamfer2_edges_5:
        chamfer2.Add(CHAMFER2_SIZE, CHAMFER2_SIZE2, e.wrapped, chamfer2_side_5[0].wrapped)  # the first distance lies on this face
    for e in chamfer2_edges_6:
        chamfer2.Add(CHAMFER2_SIZE, CHAMFER2_SIZE2, e.wrapped, chamfer2_side_6[0].wrapped)  # the first distance lies on this face
    for e in chamfer2_edges_7:
        chamfer2.Add(CHAMFER2_SIZE, CHAMFER2_SIZE2, e.wrapped, chamfer2_side_7[0].wrapped)  # the first distance lies on this face
    for e in chamfer2_edges_8:
        chamfer2.Add(CHAMFER2_SIZE, CHAMFER2_SIZE2, e.wrapped, chamfer2_side_8[0].wrapped)  # the first distance lies on this face
    for e in chamfer2_edges_9:
        chamfer2.Add(CHAMFER2_SIZE, CHAMFER2_SIZE2, e.wrapped, chamfer2_side_9[0].wrapped)  # the first distance lies on this face
    add(Compound.cast(chamfer2.Shape()), mode=Mode.REPLACE)


solid = part.part
